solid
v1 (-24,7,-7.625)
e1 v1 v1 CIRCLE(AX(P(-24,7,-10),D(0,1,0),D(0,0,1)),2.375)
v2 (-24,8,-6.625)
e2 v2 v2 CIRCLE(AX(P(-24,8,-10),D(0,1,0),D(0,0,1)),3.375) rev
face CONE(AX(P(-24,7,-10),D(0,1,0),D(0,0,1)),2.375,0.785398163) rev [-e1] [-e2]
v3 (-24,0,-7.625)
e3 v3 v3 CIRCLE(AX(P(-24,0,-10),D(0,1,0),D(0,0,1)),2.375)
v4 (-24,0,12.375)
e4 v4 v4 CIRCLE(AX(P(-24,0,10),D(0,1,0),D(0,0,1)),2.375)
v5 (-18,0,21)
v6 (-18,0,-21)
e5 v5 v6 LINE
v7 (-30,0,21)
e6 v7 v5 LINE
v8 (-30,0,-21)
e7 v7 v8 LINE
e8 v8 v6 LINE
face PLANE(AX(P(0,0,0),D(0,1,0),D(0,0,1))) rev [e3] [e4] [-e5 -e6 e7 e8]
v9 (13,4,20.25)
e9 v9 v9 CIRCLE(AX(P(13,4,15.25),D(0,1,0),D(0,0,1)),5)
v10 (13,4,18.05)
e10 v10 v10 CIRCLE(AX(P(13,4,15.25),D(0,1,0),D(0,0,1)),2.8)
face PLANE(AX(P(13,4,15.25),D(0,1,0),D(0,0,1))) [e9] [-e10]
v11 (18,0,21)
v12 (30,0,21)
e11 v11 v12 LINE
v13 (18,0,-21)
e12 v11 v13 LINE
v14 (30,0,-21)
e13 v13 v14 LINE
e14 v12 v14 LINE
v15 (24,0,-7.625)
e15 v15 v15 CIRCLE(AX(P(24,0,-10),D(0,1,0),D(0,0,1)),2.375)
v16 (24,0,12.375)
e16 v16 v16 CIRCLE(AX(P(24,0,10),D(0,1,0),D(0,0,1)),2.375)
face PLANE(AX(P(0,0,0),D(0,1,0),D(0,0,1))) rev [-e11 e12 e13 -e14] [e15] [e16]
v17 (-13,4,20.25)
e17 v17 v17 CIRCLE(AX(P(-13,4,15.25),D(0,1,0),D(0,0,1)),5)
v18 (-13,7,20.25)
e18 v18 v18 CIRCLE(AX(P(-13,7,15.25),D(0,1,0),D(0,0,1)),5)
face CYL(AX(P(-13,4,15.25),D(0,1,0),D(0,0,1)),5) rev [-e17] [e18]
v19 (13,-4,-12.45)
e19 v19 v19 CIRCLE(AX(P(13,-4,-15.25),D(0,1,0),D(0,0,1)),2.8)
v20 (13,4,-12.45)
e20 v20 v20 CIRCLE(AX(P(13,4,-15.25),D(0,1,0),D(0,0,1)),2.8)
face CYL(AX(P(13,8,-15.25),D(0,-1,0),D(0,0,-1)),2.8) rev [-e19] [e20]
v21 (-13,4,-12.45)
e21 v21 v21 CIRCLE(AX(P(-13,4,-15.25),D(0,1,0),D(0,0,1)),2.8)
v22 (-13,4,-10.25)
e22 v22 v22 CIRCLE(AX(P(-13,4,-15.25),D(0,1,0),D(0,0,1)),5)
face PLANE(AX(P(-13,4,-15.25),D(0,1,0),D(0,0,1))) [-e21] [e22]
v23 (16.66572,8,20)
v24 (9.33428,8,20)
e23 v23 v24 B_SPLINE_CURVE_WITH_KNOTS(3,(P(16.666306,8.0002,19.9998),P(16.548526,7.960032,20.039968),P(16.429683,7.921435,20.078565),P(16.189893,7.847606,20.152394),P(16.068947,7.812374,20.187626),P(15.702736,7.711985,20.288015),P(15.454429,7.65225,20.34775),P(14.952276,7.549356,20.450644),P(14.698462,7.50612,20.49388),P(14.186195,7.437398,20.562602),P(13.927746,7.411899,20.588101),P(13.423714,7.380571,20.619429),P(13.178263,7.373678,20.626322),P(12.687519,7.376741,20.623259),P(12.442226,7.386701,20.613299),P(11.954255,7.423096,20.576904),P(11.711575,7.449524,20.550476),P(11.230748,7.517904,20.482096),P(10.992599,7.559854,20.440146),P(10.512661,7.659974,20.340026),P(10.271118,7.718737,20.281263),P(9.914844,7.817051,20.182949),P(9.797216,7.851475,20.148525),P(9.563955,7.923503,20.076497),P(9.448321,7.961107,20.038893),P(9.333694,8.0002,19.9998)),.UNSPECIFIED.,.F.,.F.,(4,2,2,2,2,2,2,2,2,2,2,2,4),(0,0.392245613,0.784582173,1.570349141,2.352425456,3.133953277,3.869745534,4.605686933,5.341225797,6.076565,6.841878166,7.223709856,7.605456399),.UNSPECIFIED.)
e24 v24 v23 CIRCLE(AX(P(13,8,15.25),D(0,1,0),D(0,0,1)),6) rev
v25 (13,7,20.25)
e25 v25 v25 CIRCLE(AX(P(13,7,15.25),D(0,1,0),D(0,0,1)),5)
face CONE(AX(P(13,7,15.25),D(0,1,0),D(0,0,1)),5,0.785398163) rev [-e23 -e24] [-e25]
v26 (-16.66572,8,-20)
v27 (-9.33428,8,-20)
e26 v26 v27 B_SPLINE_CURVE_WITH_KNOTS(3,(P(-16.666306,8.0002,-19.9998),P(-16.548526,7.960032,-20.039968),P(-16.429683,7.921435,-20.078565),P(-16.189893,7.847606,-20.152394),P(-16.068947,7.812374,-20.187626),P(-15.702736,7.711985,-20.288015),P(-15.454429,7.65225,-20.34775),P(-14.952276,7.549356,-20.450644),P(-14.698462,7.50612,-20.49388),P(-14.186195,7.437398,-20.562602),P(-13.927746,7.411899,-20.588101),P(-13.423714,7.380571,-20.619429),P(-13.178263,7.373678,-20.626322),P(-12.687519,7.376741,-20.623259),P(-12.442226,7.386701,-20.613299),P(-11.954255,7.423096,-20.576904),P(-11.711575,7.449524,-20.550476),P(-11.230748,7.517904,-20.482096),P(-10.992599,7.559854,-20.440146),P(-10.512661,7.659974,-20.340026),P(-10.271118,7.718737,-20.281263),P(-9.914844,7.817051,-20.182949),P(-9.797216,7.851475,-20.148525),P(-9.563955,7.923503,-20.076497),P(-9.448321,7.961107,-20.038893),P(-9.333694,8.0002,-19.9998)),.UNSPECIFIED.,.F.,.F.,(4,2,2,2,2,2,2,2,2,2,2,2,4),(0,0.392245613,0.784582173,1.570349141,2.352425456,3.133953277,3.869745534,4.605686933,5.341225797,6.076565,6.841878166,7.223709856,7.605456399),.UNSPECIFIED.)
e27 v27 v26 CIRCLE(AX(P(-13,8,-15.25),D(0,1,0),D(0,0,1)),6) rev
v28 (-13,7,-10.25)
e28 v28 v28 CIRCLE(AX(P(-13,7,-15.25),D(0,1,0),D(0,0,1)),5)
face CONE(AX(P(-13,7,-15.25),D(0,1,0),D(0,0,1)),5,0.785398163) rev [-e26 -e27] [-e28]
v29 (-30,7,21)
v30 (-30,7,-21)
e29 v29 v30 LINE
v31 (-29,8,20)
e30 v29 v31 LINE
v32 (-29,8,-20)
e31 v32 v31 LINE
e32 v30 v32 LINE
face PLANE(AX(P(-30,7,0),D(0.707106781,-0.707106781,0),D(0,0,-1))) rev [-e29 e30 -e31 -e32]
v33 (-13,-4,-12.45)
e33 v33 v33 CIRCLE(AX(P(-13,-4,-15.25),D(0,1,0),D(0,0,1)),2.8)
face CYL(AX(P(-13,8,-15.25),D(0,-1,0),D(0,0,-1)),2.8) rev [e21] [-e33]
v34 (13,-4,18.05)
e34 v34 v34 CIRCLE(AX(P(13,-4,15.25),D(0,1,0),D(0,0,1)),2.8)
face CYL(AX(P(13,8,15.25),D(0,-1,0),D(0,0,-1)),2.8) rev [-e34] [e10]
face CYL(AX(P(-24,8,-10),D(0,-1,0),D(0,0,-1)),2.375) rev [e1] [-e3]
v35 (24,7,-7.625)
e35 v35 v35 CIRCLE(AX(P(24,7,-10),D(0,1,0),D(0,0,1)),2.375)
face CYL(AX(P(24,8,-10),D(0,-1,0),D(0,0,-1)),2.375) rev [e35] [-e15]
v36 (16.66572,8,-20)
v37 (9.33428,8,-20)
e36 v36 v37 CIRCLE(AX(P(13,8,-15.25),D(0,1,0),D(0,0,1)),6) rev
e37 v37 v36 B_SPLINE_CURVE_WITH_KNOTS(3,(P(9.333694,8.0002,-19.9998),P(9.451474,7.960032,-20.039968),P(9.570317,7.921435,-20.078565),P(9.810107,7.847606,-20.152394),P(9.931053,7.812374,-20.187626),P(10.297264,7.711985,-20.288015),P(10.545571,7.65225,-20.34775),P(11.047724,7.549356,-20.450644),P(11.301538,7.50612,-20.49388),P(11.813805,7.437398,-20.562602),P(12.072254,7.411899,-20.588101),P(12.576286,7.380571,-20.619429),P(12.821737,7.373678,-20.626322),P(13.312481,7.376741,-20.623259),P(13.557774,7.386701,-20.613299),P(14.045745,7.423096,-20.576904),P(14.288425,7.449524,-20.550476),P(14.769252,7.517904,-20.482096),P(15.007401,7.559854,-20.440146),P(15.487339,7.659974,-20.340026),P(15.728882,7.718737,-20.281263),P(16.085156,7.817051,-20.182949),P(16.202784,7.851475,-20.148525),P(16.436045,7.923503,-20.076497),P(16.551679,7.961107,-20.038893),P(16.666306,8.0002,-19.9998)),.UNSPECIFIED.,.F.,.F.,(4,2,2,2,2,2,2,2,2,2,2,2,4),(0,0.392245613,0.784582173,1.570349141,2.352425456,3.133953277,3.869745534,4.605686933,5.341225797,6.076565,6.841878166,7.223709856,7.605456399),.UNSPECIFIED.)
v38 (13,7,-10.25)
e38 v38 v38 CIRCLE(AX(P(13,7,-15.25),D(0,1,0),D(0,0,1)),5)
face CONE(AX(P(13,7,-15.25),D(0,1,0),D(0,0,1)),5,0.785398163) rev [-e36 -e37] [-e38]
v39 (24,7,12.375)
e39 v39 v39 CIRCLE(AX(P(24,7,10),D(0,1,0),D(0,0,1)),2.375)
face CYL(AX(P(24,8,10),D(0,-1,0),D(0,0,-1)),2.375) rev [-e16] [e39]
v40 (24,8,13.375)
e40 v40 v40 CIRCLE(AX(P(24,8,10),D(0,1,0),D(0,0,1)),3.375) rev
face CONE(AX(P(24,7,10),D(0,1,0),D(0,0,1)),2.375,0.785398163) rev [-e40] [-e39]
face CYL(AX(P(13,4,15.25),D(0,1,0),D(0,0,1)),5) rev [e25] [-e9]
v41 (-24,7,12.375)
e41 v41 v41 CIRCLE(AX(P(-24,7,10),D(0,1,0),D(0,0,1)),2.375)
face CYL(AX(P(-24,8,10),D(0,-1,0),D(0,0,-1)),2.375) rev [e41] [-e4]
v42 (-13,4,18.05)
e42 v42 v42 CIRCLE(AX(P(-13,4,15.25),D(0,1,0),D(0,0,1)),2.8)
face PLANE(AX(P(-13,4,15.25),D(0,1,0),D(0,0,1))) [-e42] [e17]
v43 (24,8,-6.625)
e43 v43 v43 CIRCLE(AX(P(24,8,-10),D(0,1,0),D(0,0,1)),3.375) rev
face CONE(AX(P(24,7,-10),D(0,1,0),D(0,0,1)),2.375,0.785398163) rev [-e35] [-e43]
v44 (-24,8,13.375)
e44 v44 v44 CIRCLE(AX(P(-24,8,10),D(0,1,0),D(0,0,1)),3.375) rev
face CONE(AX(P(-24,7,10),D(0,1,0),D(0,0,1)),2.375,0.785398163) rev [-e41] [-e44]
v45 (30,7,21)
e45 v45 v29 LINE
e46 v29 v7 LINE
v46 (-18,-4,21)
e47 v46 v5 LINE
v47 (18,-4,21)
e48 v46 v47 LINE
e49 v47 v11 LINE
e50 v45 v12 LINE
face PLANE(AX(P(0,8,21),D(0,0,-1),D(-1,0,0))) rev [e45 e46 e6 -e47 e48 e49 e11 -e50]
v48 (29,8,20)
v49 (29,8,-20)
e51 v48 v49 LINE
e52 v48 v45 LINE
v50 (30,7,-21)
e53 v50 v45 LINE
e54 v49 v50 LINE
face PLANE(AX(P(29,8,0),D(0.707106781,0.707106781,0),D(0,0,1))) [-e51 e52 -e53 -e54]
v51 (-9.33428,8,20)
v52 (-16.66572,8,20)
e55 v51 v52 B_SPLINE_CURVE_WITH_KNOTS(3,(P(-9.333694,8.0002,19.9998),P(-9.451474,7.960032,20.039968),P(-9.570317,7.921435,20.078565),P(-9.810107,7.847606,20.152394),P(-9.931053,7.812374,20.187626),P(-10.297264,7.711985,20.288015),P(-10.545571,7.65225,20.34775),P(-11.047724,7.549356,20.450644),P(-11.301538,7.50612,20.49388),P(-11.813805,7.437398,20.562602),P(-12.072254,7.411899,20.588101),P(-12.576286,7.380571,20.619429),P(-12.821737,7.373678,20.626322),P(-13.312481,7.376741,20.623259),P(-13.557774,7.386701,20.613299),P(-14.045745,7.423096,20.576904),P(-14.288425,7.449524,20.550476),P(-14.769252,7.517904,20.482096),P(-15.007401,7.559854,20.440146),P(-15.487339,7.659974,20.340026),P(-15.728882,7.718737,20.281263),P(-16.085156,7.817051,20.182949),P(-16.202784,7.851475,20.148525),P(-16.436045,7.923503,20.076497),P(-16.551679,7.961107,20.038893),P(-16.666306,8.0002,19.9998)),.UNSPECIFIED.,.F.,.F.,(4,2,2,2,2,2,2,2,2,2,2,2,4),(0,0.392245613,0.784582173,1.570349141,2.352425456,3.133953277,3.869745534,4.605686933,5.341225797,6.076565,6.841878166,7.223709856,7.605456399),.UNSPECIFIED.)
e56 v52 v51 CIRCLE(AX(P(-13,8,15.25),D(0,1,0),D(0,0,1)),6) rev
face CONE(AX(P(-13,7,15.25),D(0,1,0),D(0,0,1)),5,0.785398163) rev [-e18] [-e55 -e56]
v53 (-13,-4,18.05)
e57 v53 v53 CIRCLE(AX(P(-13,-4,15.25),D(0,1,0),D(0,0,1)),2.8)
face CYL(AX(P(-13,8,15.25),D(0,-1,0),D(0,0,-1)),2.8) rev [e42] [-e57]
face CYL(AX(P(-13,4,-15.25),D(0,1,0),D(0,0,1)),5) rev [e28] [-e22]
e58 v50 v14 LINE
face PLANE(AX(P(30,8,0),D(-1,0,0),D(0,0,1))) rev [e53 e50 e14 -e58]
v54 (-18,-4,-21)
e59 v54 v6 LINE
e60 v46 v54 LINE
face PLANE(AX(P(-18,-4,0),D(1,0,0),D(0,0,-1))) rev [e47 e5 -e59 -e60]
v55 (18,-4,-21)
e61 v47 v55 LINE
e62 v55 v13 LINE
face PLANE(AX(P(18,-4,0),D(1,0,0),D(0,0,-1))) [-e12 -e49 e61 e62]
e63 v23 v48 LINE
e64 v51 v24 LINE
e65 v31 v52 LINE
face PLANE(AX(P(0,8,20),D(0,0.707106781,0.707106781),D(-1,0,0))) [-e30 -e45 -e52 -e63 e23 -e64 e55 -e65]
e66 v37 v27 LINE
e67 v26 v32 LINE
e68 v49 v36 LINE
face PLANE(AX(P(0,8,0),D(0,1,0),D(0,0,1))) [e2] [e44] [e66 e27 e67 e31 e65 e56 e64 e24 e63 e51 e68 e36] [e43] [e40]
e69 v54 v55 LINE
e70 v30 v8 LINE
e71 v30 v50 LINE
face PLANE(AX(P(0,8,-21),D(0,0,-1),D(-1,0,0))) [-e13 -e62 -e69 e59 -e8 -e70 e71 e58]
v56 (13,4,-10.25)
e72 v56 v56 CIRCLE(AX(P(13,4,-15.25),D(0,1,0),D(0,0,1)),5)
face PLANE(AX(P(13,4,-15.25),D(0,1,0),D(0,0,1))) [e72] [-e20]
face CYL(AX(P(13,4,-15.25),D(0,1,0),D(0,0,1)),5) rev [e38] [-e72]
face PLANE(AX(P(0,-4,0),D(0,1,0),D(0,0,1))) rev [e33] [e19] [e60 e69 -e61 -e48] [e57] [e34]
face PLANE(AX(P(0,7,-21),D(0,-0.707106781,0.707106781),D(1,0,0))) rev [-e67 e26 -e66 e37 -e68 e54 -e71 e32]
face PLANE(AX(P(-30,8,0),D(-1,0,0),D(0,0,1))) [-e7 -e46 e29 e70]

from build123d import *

# Parameters (mm, degrees)
ESBO_O1_W                = 60
ESBO_O1_H                = 42
ESBO_O1_R                = 2.8
ESBO_O1_R_2              = 2.375
RESSALTO_EXTRUS_O1_DEPTH = 8
CORTE_EXTRUS_O1_START    = 8
ESBO_O1_3_R              = 5
CORTE_EXTRUS_O1_DEPTH    = 4
RESSALTO_EXTRUS_O4_START = -4
ESBO_O1_5_W              = 36
ESBO_O1_5_H              = 42
ESBO_O1_5_R              = 2.8
RESSALTO_EXTRUS_O4_DEPTH = 4
CHANFRO1_SIZE            = 1


with BuildPart() as part:
    # Esboço1 → Ressalto-extrusão1 (new body)
    with BuildSketch(Plane(origin=(0, 0, 0), x_dir=(1, 0, 0), z_dir=(0, 1, 0))):
        Rectangle(ESBO_O1_W, ESBO_O1_H)
        with Locations(Location((-13, 15.25, 0), (0, 0, 270))):
            Circle(ESBO_O1_R, mode=Mode.SUBTRACT)
        with Locations(Location((-13, -15.25, 0), (0, 0, 270))):
            Circle(ESBO_O1_R, mode=Mode.SUBTRACT)
        with Locations(Location((13, 15.25, 0), (0, 0, 270))):
            Circle(ESBO_O1_R, mode=Mode.SUBTRACT)
        with Locations(Location((13, -15.25, 0), (0, 0, 270))):
            Circle(ESBO_O1_R, mode=Mode.SUBTRACT)
        with Locations(Location((-24, 10, 0), (0, 0, 270))):
            Circle(ESBO_O1_R_2, mode=Mode.SUBTRACT)
        with Locations(Location((-24, -10, 0), (0, 0, 270))):
            Circle(ESBO_O1_R_2, mode=Mode.SUBTRACT)
        with Locations(Location((24, -10, 0), (0, 0, 270))):
            Circle(ESBO_O1_R_2, mode=Mode.SUBTRACT)
        with Locations(Location((24, 10, 0), (0, 0, 270))):
            Circle(ESBO_O1_R_2, mode=Mode.SUBTRACT)
    extrude(amount=RESSALTO_EXTRUS_O1_DEPTH)

    # Esboço1<3> → Corte-extrusão1 (cut)
    with BuildSketch(Plane(origin=(0, 0, 0), x_dir=(1, 0, 0), z_dir=(0, 1, 0)).offset(CORTE_EXTRUS_O1_START)):
        with Locations(Location((-13, 15.25, 0), (0, 0, 270))):
            Circle(ESBO_O1_3_R)
        with Locations(Location((13, 15.25, 0), (0, 0, 270))):
            Circle(ESBO_O1_3_R)
        with Locations(Location((13, -15.25, 0), (0, 0, 270))):
            Circle(ESBO_O1_3_R)
        with Locations(Location((-13, -15.25, 0), (0, 0, 270))):
            Circle(ESBO_O1_3_R)
    extrude(amount=-CORTE_EXTRUS_O1_DEPTH, mode=Mode.SUBTRACT)

    # Esboço1<5> → Ressalto-extrusão4 (add)
    with BuildSketch(Plane(origin=(0, 0, 0), x_dir=(1, 0, 0), z_dir=(0, 1, 0)).offset(RESSALTO_EXTRUS_O4_START)):
        Rectangle(ESBO_O1_5_W, ESBO_O1_5_H)
        with Locations(Location((13, -15.25, 0), (0, 0, 270))):
            Circle(ESBO_O1_5_R, mode=Mode.SUBTRACT)
        with Locations(Location((-13, -15.25, 0), (0, 0, 270))):
            Circle(ESBO_O1_5_R, mode=Mode.SUBTRACT)
        with Locations(Location((13, 15.25, 0), (0, 0, 270))):
            Circle(ESBO_O1_5_R, mode=Mode.SUBTRACT)
        with Locations(Location((-13, 15.25, 0), (0, 0, 270))):
            Circle(ESBO_O1_5_R, mode=Mode.SUBTRACT)
    extrude(amount=RESSALTO_EXTRUS_O4_DEPTH)

    # Chanfro1
    # the kernel refuses this chamfer: 1 mm, written as the material it takes off along each edge
    with BuildSketch(Plane(origin=(-30, 8, -23.571682988), x_dir=(0.9996219169112968, 0.027495876610585647, 0), z_dir=(0, 0, 1))) as chanfro1_piece_1:
        Polygon((CHANFRO1_SIZE * 0.999621916911, -CHANFRO1_SIZE * 0.0274958766106), (-CHANFRO1_SIZE * 0.0274958766106, -CHANFRO1_SIZE * 0.999621916911), (0, 0), align=None)
    extrude(amount=47.143365976, mode=Mode.SUBTRACT)
    with BuildSketch(Plane(origin=(-32.571682988, 8, 21), x_dir=(0, -0.9996219169112968, 0.027495876610585623), z_dir=(1, 0, 0)), Plane(origin=(32.571682988, 8, -21), x_dir=(0, -0.9996219169112968, -0.027495876610585623), z_dir=(-1, 0, 0))) as chanfro1_piece_2:
        Polygon((CHANFRO1_SIZE * 0.999621916911, CHANFRO1_SIZE * 0.0274958766106), (-CHANFRO1_SIZE * 0.0274958766106, CHANFRO1_SIZE * 0.999621916911), (0, 0), align=None)
    extrude(amount=65.143365976, mode=Mode.SUBTRACT)
    with BuildSketch(Plane(origin=(30, 8, 23.571682988), x_dir=(0.027495876610585623, -0.9996219169112968, 0), z_dir=(0, 0, -1))) as chanfro1_piece_3:
        Polygon((CHANFRO1_SIZE * 0.999621916911, CHANFRO1_SIZE * 0.0274958766106), (-CHANFRO1_SIZE * 0.0274958766106, CHANFRO1_SIZE * 0.999621916911), (0, 0), align=None)
    extrude(amount=47.143365976, mode=Mode.SUBTRACT)
    with BuildSketch(Plane(origin=(-24, 8, 10), x_dir=(0, 0, 1), z_dir=(-1, 0, 0))) as chanfro1_piece_4:
        Polygon((2.375, -CHANFRO1_SIZE), (2.375 + CHANFRO1_SIZE, 0), (2.375, 0), align=None)
    revolve(axis=Axis((-24, 8, 10), (0, 1, 0)), mode=Mode.SUBTRACT)
    with BuildSketch(Plane(origin=(-24, 8, -10), x_dir=(0, 0, 1), z_dir=(-1, 0, 0))) as chanfro1_piece_5:
        Polygon((2.375, -CHANFRO1_SIZE), (2.375 + CHANFRO1_SIZE, 0), (2.375, 0), align=None)
    revolve(axis=Axis((-24, 8, -10), (0, 1, 0)), mode=Mode.SUBTRACT)
    with BuildSketch(Plane(origin=(-13, 8, -15.25), x_dir=(0, 0, 1), z_dir=(-1, 0, 0))) as chanfro1_piece_6:
        Polygon((5, -CHANFRO1_SIZE), (5 + CHANFRO1_SIZE, 0), (5, 0), align=None)
    revolve(axis=Axis((-13, 8, -15.25), (0, 1, 0)), mode=Mode.SUBTRACT)
    with BuildSketch(Plane(origin=(24, 8, -10), x_dir=(0, 0, 1), z_dir=(-1, 0, 0))) as chanfro1_piece_7:
        Polygon((2.375, -CHANFRO1_SIZE), (2.375 + CHANFRO1_SIZE, 0), (2.375, 0), align=None)
    revolve(axis=Axis((24, 8, -10), (0, 1, 0)), mode=Mode.SUBTRACT)
    with BuildSketch(Plane(origin=(24, 8, 10), x_dir=(0, 0, 1), z_dir=(-1, 0, 0))) as chanfro1_piece_8:
        Polygon((2.375, -CHANFRO1_SIZE), (2.375 + CHANFRO1_SIZE, 0), (2.375, 0), align=None)
    revolve(axis=Axis((24, 8, 10), (0, 1, 0)), mode=Mode.SUBTRACT)
    with BuildSketch(Plane(origin=(13, 8, -15.25), x_dir=(0, 0, 1), z_dir=(-1, 0, 0))) as chanfro1_piece_9:
        Polygon((5, -CHANFRO1_SIZE), (5 + CHANFRO1_SIZE, 0), (5, 0), align=None)
    revolve(axis=Axis((13, 8, -15.25), (0, 1, 0)), mode=Mode.SUBTRACT)
    with BuildSketch(Plane(origin=(-13, 8, 15.25), x_dir=(0, 0, 1), z_dir=(-1, 0, 0))) as chanfro1_piece_10:
        Polygon((5, -CHANFRO1_SIZE), (5 + CHANFRO1_SIZE, 0), (5, 0), align=None)
    revolve(axis=Axis((-13, 8, 15.25), (0, 1, 0)), mode=Mode.SUBTRACT)
    with BuildSketch(Plane(origin=(13, 8, 15.25), x_dir=(0, 0, 1), z_dir=(-1, 0, 0))) as chanfro1_piece_11:
        Polygon((5, -CHANFRO1_SIZE), (5 + CHANFRO1_SIZE, 0), (5, 0), align=None)
    revolve(axis=Axis((13, 8, 15.25), (0, 1, 0)), mode=Mode.SUBTRACT)


solid = part.part
